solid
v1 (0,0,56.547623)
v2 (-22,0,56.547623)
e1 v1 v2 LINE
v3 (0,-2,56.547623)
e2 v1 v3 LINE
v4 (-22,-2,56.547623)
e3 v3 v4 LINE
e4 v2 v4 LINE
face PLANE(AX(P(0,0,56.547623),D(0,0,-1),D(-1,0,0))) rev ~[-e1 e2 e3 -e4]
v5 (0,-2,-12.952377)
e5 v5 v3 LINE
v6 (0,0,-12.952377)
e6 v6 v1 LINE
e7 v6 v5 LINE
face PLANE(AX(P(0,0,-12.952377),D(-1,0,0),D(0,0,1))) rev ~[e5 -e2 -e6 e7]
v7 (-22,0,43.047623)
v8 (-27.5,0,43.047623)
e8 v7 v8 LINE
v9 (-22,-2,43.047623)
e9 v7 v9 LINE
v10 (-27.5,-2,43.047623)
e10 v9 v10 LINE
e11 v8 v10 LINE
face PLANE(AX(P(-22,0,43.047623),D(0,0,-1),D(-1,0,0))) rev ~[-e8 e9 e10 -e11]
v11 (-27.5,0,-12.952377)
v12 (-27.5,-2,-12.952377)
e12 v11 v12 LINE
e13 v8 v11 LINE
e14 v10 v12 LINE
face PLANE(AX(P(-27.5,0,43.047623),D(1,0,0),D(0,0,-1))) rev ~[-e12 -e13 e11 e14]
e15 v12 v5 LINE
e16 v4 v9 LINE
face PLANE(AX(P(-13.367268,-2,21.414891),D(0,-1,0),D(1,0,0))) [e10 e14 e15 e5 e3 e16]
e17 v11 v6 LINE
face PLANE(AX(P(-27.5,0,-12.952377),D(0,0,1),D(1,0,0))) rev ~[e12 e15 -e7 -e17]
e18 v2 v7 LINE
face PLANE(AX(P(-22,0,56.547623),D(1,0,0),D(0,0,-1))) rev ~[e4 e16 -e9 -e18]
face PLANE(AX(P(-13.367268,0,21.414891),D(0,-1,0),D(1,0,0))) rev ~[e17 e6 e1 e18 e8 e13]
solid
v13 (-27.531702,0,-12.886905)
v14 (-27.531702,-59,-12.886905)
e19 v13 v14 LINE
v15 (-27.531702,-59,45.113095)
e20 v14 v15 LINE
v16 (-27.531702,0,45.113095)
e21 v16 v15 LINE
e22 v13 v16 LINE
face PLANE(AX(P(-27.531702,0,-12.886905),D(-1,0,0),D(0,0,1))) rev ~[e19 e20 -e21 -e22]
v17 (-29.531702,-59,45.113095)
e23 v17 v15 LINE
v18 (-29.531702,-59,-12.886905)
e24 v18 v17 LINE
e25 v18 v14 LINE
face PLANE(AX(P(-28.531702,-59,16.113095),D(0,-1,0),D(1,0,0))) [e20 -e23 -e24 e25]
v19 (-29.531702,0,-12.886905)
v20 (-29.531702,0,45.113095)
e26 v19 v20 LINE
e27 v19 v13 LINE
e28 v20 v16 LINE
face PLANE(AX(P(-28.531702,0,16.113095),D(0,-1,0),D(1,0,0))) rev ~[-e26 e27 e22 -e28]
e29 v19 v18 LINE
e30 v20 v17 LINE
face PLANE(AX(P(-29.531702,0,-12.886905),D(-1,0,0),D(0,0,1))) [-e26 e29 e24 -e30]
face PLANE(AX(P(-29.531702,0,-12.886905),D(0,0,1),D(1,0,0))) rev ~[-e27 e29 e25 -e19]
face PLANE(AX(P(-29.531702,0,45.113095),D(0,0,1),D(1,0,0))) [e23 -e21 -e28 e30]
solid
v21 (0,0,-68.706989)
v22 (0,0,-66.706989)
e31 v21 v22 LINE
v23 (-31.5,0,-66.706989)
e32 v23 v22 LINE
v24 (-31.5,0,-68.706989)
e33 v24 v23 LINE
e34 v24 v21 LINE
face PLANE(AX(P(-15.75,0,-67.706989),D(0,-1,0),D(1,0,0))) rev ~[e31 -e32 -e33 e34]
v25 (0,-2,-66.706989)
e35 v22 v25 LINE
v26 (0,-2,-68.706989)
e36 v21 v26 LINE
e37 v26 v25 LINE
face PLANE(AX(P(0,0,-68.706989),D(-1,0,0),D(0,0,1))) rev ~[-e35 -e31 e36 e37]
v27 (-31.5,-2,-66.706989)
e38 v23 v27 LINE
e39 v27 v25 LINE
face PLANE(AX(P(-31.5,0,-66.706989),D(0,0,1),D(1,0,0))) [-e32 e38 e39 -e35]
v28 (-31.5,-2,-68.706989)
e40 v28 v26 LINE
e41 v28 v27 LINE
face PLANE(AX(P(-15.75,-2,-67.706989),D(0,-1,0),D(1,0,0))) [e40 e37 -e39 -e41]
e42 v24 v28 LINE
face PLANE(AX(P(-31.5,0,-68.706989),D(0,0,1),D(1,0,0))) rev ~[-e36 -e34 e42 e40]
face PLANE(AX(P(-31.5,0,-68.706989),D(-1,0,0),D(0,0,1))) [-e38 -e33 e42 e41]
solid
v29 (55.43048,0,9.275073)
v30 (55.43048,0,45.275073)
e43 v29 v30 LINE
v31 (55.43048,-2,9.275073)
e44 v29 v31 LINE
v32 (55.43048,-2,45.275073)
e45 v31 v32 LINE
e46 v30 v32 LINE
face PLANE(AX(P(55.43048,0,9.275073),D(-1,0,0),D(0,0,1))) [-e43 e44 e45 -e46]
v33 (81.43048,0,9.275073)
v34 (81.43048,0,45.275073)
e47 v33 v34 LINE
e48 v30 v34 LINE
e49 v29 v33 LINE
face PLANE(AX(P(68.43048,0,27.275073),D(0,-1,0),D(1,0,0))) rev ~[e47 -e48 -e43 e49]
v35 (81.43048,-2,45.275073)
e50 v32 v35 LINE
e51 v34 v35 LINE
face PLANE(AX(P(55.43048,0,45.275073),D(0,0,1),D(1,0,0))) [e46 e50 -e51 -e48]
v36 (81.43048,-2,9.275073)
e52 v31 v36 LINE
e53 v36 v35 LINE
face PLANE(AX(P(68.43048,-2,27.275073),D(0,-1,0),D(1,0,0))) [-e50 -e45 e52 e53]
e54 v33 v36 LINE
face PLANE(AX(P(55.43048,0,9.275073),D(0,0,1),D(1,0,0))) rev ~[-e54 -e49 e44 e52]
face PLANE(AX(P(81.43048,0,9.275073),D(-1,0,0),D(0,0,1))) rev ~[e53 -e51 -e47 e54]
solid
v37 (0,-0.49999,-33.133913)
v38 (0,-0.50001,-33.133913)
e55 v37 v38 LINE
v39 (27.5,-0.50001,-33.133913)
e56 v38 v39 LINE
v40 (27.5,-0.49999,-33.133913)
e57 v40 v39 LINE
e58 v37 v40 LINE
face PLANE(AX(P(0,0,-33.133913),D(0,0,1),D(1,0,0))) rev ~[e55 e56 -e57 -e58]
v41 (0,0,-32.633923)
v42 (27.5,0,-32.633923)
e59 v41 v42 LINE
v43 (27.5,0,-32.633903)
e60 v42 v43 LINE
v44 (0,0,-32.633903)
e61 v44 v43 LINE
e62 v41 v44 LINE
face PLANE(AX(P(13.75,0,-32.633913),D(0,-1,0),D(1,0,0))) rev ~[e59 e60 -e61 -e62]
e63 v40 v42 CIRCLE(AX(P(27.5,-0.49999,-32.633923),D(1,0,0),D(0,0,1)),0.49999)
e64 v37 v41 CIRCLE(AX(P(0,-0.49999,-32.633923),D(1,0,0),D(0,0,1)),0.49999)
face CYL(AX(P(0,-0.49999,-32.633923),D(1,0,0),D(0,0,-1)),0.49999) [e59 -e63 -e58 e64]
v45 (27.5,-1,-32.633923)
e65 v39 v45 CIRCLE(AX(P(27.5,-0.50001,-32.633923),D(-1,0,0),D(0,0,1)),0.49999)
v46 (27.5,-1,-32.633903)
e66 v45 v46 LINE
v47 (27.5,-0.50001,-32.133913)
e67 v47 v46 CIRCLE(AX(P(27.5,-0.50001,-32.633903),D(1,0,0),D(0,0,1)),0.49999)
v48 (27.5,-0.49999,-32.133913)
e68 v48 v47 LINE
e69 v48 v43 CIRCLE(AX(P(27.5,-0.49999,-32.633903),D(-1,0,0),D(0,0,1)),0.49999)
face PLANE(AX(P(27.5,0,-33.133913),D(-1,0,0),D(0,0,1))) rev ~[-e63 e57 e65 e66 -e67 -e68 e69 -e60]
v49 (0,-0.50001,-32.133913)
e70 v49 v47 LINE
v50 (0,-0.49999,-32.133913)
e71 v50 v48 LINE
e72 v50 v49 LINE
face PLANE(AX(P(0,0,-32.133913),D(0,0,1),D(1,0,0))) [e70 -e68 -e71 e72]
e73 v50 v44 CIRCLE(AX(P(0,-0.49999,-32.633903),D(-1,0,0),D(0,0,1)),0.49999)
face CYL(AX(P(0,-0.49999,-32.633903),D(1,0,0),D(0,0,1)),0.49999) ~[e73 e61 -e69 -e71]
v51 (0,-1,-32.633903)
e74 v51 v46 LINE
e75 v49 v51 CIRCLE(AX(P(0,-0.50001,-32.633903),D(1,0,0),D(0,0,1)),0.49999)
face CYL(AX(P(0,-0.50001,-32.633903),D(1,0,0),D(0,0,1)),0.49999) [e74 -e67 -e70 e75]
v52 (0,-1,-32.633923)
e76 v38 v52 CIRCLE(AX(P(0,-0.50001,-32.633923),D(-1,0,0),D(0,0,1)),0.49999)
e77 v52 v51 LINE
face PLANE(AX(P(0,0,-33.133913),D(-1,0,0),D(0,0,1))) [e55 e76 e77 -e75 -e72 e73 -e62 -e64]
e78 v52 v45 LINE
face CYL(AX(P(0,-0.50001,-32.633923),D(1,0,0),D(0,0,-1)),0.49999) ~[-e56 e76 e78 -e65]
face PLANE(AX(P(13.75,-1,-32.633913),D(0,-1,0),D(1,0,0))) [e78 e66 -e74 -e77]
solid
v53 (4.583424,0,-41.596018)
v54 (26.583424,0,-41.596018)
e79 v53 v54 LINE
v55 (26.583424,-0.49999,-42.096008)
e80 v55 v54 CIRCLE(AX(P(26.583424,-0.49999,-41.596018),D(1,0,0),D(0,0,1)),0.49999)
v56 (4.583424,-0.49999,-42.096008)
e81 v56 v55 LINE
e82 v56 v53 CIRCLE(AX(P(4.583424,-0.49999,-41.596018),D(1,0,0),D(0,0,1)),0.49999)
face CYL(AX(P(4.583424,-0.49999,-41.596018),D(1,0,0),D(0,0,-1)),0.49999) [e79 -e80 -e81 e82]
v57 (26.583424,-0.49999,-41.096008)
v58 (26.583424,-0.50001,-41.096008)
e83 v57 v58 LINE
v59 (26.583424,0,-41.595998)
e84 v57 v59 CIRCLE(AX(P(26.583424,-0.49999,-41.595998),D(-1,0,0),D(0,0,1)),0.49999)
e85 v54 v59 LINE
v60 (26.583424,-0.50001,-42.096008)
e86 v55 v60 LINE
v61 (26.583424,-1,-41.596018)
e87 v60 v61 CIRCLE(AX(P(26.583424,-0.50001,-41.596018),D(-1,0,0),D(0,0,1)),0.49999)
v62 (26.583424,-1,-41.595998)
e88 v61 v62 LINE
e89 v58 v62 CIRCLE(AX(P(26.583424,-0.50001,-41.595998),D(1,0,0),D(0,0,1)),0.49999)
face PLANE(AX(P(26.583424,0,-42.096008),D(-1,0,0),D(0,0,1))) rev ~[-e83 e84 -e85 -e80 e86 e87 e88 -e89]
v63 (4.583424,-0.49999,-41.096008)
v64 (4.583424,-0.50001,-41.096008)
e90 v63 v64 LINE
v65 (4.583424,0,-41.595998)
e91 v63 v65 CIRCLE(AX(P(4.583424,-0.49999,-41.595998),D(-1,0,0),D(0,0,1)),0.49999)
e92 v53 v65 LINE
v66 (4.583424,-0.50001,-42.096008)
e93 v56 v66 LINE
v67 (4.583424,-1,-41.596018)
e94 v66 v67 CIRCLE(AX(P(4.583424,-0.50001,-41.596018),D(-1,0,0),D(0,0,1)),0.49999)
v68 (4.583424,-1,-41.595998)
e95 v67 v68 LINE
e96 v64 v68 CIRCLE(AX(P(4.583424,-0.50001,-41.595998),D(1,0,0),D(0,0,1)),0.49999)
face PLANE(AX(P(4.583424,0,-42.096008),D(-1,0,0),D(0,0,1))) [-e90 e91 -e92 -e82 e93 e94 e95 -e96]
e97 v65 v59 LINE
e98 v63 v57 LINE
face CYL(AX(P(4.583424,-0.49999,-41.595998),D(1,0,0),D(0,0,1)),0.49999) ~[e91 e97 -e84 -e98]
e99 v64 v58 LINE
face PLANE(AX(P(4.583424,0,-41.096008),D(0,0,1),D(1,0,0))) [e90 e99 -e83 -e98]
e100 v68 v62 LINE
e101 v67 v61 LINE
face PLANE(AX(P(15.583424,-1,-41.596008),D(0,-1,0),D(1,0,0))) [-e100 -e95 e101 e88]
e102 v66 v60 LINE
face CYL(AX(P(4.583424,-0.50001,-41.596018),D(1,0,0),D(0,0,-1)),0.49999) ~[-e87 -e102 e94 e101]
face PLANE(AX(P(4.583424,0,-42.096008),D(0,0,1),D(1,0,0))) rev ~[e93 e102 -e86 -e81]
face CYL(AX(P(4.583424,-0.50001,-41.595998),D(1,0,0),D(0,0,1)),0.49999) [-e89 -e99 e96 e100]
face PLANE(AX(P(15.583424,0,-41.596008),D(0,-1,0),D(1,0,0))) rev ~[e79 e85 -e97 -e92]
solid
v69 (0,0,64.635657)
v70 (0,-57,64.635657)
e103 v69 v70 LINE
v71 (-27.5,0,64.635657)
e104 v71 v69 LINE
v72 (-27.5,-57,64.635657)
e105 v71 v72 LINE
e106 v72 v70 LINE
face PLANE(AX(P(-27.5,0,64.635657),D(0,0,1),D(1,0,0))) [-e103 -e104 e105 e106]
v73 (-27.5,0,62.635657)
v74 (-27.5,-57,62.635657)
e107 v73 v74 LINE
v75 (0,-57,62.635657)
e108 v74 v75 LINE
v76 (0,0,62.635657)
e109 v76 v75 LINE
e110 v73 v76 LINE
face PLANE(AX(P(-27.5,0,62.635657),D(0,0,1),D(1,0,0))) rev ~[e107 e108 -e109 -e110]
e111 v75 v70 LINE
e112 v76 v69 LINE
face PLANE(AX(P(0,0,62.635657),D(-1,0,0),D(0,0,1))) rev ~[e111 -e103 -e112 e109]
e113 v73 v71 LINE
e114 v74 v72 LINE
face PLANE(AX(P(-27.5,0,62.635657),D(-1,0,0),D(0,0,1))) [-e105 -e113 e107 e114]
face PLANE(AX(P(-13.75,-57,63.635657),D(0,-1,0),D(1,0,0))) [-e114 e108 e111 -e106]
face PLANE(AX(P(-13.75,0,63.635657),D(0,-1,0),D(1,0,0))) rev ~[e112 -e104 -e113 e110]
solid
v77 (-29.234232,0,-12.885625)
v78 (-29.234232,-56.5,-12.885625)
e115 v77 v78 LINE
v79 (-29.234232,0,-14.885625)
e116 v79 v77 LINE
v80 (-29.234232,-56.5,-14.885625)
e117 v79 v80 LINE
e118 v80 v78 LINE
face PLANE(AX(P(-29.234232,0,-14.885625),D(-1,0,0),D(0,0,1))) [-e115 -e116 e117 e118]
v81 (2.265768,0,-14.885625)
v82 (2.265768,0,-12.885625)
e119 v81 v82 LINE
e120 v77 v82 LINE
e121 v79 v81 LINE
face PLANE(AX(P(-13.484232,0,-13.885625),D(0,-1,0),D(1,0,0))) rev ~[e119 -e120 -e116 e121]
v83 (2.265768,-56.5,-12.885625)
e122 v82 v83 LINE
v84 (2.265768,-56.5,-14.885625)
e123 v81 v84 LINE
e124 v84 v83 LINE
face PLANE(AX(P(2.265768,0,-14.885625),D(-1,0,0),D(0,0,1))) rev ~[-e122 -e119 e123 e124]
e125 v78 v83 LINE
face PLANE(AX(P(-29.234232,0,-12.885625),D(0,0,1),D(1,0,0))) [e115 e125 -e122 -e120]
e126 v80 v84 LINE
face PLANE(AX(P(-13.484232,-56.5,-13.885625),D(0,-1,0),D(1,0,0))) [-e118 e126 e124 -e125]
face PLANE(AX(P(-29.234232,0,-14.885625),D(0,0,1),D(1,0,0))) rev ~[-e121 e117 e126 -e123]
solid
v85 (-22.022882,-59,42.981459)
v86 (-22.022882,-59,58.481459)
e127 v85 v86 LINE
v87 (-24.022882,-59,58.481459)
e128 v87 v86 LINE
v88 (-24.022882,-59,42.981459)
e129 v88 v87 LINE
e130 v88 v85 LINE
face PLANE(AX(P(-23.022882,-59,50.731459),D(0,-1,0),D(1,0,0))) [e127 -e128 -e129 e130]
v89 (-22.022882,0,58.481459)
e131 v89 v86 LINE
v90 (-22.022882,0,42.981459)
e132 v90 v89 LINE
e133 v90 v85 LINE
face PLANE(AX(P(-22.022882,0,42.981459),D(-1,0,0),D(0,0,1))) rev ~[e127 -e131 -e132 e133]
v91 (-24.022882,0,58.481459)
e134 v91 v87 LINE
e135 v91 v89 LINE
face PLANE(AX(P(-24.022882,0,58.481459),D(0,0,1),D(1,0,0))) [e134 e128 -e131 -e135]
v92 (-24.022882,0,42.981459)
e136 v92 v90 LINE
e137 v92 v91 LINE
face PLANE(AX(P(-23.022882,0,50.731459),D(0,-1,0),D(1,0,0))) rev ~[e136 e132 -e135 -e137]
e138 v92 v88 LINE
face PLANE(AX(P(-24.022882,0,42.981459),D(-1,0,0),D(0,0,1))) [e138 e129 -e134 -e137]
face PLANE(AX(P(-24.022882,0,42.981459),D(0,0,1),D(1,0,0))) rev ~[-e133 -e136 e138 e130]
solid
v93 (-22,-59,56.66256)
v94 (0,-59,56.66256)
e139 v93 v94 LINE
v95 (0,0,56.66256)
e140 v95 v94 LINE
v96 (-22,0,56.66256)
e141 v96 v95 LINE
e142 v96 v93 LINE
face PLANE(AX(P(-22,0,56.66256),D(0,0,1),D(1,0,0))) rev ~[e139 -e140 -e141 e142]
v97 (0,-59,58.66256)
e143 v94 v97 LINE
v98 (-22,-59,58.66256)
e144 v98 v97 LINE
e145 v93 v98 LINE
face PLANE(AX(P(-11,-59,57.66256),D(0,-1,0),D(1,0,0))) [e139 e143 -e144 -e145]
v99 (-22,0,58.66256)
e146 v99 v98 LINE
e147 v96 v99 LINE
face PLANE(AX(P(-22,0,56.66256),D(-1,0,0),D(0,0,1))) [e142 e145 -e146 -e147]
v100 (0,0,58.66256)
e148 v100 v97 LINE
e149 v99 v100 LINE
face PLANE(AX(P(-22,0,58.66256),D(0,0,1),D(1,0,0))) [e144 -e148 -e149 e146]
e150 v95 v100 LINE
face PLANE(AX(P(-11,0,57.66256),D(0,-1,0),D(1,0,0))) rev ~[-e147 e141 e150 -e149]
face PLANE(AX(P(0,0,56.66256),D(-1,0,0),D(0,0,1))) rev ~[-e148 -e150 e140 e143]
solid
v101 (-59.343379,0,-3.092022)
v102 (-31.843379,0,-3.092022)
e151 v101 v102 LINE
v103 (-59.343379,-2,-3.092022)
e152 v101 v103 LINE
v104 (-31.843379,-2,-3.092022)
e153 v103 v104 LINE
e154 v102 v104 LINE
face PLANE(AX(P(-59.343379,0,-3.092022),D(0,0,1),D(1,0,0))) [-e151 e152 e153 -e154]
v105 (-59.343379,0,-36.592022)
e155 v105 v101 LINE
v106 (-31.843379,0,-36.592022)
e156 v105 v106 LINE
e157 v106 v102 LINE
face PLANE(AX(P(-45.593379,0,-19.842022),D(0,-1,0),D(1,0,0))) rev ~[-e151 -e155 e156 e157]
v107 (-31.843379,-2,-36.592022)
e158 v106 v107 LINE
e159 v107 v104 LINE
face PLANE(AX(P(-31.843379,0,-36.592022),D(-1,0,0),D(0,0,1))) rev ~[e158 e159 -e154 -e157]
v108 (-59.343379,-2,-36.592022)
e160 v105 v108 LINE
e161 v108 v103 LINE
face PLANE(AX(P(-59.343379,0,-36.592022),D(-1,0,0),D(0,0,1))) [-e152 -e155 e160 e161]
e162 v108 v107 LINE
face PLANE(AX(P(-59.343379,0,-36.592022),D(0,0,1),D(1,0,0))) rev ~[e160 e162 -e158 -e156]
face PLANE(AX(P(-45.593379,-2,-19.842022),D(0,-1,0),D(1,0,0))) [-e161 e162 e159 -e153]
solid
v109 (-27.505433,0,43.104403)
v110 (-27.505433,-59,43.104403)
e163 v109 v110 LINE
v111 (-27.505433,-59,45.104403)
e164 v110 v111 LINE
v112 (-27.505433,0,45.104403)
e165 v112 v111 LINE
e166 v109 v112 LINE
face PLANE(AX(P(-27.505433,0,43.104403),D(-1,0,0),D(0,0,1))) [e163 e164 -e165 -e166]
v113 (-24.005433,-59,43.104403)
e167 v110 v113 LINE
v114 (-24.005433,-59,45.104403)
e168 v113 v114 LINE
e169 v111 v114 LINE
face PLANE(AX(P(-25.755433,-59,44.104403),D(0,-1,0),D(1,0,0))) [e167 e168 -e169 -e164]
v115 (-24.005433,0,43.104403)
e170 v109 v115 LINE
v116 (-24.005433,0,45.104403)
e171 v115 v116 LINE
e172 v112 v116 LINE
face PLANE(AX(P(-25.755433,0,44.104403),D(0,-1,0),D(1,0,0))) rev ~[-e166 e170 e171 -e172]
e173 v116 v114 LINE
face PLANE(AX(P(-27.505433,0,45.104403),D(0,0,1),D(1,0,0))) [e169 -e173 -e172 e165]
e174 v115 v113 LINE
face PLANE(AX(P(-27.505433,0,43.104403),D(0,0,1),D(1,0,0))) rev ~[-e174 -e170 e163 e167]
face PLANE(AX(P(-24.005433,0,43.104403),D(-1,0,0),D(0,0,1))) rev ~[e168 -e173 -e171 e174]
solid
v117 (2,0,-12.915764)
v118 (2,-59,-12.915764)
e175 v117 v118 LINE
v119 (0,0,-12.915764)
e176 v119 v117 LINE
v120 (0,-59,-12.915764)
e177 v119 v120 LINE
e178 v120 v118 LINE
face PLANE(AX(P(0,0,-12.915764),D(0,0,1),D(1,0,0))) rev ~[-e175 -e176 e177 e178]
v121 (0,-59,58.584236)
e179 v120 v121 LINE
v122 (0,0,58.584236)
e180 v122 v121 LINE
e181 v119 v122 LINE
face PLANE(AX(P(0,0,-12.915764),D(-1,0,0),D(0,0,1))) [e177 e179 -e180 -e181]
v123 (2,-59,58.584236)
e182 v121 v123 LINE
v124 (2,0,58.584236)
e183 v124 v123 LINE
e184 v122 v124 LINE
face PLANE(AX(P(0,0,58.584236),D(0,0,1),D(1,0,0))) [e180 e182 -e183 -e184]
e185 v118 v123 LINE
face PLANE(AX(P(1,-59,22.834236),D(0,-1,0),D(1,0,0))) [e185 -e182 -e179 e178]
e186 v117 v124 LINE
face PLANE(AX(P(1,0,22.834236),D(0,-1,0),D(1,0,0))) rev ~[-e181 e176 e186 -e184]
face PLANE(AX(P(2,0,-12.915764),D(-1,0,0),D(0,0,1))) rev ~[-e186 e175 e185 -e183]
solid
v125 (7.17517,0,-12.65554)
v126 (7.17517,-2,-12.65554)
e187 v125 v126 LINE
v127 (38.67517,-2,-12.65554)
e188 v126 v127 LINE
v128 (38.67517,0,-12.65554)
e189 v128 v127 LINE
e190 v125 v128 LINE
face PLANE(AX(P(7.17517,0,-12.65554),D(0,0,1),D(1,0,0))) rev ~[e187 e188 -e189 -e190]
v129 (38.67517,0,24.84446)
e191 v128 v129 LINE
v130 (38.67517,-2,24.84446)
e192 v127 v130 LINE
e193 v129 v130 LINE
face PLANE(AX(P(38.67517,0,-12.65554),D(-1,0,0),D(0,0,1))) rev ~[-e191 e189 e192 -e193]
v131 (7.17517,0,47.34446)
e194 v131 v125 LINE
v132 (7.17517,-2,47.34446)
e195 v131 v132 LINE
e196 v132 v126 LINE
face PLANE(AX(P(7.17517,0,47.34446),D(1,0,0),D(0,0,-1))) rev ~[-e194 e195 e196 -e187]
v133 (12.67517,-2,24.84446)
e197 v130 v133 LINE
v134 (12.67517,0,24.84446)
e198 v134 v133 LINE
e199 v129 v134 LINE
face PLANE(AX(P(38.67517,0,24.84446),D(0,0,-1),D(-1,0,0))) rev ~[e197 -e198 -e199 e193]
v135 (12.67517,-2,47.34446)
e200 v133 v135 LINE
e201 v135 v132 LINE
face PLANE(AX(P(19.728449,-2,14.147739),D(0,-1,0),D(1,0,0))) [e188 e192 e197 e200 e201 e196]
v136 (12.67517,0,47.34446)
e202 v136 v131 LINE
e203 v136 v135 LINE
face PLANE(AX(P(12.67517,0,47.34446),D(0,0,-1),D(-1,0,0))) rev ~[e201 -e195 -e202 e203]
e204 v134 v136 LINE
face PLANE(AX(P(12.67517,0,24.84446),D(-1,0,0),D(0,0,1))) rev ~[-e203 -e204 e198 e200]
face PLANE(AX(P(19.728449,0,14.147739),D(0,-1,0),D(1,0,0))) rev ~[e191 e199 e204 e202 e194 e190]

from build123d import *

# Parameters (mm, degrees)
F1_DEPTH  = 2
F2_W      = 2
F2_H      = 15.5
F3_DEPTH  = 59
F4_W      = 3.5
F4_H      = 2
F5_DEPTH  = 59
F6_W      = 2
F6_H      = 71.5
F7_DEPTH  = 59
F8_W      = 2
F8_H      = 58
F9_DEPTH  = 59
F10_W     = 22
F10_H     = 2
F11_DEPTH = 59
F12_W     = 31.5
F12_H     = 2
F13_DEPTH = 56.5
F14_W     = 27.5
F14_H     = 2
F15_DEPTH = 57
F17_DEPTH = 2
F18_W     = 27.5
F18_H     = 33.5
F19_DEPTH = 2
F20_W     = 26
F20_H     = 36
F21_DEPTH = 2
F22_W     = 27.5
F22_H     = 1
F23_DEPTH = 1
F24_R     = 0.49999
F25_W     = 22
F25_H     = 1
F26_DEPTH = 1
F27_R     = 0.49999
F28_W     = 31.5
F28_H     = 2
F29_DEPTH = 2


# Not quite as in the source:
# - a fillet or chamfer is up to 0.001 mm smaller than in the source, because OpenCascade refuses the exact size


with BuildPart() as f1:
    # F0 (on Front) → F1 (new body)
    with BuildSketch(Plane.XZ):
        Polygon((-22, 43.0476225019), (-27.5, 43.0476225019), (-27.5, -12.9523774981), (0, -12.9523774981), (0, 56.5476225019), (-22, 56.5476225019), align=None)
    extrude(amount=F1_DEPTH)


with BuildPart() as f3:
    # F2 (on Front) → F3 (new body)
    with BuildSketch(Plane.XZ):
        with Locations((-23.0228824764, 50.7314585745)):
            Rectangle(F2_W, F2_H)
    extrude(amount=F3_DEPTH)


with BuildPart() as f5:
    # F4 (on Front) → F5 (new body)
    with BuildSketch(Plane.XZ):
        with Locations((-25.7554331869, 44.1044030488)):
            Rectangle(F4_W, F4_H)
    extrude(amount=F5_DEPTH)


with BuildPart() as f7:
    # F6 (on Front) → F7 (new body)
    with BuildSketch(Plane.XZ):
        with Locations((1, 22.834235996)):
            Rectangle(F6_W, F6_H)
    extrude(amount=F7_DEPTH)


with BuildPart() as f9:
    # F8 (on Front) → F9 (new body)
    with BuildSketch(Plane.XZ):
        with Locations((-28.5317020714, 16.1130948886)):
            Rectangle(F8_W, F8_H)
    extrude(amount=F9_DEPTH)


with BuildPart() as f11:
    # F10 (on Front) → F11 (new body)
    with BuildSketch(Plane.XZ):
        with Locations((-11, 57.6625595093)):
            Rectangle(F10_W, F10_H)
    extrude(amount=F11_DEPTH)


with BuildPart() as f13:
    # F12 (on Front) → F13 (new body)
    with BuildSketch(Plane.XZ):
        with Locations((-13.4842316415, -13.8856245428)):
            Rectangle(F12_W, F12_H)
    extrude(amount=F13_DEPTH)


with BuildPart() as f15:
    # F14 (on Front) → F15 (new body)
    with BuildSketch(Plane.XZ):
        with Locations((-13.75, 63.635656774)):
            Rectangle(F14_W, F14_H)
    extrude(amount=F15_DEPTH)


with BuildPart() as f17:
    # F16 (on Front) → F17 (new body)
    with BuildSketch(Plane.XZ):
        Polygon((7.1751703918, 24.8444598615), (7.1751703918, -12.6555401385), (38.6751703918, -12.6555401385), (38.6751703918, 24.8444598615), (12.6751703918, 24.8444598615), (12.6751703918, 47.3444598615), (7.1751703918, 47.3444598615), align=None)
    extrude(amount=F17_DEPTH)


with BuildPart() as f19:
    # F18 (on Front) → F19 (new body)
    with BuildSketch(Plane.XZ):
        with Locations((-45.5933791399, -19.8420215845)):
            Rectangle(F18_W, F18_H)
    extrude(amount=F19_DEPTH)


with BuildPart() as f21:
    # F20 (on Front) → F21 (new body)
    with BuildSketch(Plane.XZ):
        with Locations((68.4304798841, 27.2750734985)):
            Rectangle(F20_W, F20_H)
    extrude(amount=F21_DEPTH)


with BuildPart() as f23:
    # F22 (on Front) → F23 (new body)
    with BuildSketch(Plane.XZ):
        with Locations((13.75, -32.6339128315)):
            Rectangle(F22_W, F22_H)
    extrude(amount=F23_DEPTH)

    # F24 (radius 0.5 in the source; OpenCascade refuses exactly that, so slightly less here)
    f24_edges = [f23.edges().sort_by_distance(p)[0] for p in [
        (13.75, -1, -33.133913),
        (13.75, -1, -32.133913),
        (13.75, 0, -33.133913),
        (13.75, 0, -32.133913),
    ]]
    fillet(f24_edges, radius=F24_R)


with BuildPart() as f26:
    # F25 (on Front) → F26 (new body)
    with BuildSketch(Plane.XZ):
        with Locations((15.5834236741, -41.5960076153)):
            Rectangle(F25_W, F25_H)
    extrude(amount=F26_DEPTH)

    # F27 (radius 0.5 in the source; OpenCascade refuses exactly that, so slightly less here)
    f27_edges = [f26.edges().sort_by_distance(p)[0] for p in [
        (15.583424, -1, -41.096008),
        (15.583424, -1, -42.096008),
        (15.583424, 0, -42.096008),
        (15.583424, 0, -41.096008),
    ]]
    fillet(f27_edges, radius=F27_R)


with BuildPart() as f29:
    # F28 (on Front) → F29 (new body)
    with BuildSketch(Plane.XZ):
        with Locations((-15.75, -67.7069892883)):
            Rectangle(F28_W, F28_H)
    extrude(amount=F29_DEPTH)


solid = Compound([f1.part, f3.part, f5.part, f7.part, f9.part, f11.part, f13.part, f15.part, f17.part, f19.part, f21.part, f23.part, f26.part, f29.part])
